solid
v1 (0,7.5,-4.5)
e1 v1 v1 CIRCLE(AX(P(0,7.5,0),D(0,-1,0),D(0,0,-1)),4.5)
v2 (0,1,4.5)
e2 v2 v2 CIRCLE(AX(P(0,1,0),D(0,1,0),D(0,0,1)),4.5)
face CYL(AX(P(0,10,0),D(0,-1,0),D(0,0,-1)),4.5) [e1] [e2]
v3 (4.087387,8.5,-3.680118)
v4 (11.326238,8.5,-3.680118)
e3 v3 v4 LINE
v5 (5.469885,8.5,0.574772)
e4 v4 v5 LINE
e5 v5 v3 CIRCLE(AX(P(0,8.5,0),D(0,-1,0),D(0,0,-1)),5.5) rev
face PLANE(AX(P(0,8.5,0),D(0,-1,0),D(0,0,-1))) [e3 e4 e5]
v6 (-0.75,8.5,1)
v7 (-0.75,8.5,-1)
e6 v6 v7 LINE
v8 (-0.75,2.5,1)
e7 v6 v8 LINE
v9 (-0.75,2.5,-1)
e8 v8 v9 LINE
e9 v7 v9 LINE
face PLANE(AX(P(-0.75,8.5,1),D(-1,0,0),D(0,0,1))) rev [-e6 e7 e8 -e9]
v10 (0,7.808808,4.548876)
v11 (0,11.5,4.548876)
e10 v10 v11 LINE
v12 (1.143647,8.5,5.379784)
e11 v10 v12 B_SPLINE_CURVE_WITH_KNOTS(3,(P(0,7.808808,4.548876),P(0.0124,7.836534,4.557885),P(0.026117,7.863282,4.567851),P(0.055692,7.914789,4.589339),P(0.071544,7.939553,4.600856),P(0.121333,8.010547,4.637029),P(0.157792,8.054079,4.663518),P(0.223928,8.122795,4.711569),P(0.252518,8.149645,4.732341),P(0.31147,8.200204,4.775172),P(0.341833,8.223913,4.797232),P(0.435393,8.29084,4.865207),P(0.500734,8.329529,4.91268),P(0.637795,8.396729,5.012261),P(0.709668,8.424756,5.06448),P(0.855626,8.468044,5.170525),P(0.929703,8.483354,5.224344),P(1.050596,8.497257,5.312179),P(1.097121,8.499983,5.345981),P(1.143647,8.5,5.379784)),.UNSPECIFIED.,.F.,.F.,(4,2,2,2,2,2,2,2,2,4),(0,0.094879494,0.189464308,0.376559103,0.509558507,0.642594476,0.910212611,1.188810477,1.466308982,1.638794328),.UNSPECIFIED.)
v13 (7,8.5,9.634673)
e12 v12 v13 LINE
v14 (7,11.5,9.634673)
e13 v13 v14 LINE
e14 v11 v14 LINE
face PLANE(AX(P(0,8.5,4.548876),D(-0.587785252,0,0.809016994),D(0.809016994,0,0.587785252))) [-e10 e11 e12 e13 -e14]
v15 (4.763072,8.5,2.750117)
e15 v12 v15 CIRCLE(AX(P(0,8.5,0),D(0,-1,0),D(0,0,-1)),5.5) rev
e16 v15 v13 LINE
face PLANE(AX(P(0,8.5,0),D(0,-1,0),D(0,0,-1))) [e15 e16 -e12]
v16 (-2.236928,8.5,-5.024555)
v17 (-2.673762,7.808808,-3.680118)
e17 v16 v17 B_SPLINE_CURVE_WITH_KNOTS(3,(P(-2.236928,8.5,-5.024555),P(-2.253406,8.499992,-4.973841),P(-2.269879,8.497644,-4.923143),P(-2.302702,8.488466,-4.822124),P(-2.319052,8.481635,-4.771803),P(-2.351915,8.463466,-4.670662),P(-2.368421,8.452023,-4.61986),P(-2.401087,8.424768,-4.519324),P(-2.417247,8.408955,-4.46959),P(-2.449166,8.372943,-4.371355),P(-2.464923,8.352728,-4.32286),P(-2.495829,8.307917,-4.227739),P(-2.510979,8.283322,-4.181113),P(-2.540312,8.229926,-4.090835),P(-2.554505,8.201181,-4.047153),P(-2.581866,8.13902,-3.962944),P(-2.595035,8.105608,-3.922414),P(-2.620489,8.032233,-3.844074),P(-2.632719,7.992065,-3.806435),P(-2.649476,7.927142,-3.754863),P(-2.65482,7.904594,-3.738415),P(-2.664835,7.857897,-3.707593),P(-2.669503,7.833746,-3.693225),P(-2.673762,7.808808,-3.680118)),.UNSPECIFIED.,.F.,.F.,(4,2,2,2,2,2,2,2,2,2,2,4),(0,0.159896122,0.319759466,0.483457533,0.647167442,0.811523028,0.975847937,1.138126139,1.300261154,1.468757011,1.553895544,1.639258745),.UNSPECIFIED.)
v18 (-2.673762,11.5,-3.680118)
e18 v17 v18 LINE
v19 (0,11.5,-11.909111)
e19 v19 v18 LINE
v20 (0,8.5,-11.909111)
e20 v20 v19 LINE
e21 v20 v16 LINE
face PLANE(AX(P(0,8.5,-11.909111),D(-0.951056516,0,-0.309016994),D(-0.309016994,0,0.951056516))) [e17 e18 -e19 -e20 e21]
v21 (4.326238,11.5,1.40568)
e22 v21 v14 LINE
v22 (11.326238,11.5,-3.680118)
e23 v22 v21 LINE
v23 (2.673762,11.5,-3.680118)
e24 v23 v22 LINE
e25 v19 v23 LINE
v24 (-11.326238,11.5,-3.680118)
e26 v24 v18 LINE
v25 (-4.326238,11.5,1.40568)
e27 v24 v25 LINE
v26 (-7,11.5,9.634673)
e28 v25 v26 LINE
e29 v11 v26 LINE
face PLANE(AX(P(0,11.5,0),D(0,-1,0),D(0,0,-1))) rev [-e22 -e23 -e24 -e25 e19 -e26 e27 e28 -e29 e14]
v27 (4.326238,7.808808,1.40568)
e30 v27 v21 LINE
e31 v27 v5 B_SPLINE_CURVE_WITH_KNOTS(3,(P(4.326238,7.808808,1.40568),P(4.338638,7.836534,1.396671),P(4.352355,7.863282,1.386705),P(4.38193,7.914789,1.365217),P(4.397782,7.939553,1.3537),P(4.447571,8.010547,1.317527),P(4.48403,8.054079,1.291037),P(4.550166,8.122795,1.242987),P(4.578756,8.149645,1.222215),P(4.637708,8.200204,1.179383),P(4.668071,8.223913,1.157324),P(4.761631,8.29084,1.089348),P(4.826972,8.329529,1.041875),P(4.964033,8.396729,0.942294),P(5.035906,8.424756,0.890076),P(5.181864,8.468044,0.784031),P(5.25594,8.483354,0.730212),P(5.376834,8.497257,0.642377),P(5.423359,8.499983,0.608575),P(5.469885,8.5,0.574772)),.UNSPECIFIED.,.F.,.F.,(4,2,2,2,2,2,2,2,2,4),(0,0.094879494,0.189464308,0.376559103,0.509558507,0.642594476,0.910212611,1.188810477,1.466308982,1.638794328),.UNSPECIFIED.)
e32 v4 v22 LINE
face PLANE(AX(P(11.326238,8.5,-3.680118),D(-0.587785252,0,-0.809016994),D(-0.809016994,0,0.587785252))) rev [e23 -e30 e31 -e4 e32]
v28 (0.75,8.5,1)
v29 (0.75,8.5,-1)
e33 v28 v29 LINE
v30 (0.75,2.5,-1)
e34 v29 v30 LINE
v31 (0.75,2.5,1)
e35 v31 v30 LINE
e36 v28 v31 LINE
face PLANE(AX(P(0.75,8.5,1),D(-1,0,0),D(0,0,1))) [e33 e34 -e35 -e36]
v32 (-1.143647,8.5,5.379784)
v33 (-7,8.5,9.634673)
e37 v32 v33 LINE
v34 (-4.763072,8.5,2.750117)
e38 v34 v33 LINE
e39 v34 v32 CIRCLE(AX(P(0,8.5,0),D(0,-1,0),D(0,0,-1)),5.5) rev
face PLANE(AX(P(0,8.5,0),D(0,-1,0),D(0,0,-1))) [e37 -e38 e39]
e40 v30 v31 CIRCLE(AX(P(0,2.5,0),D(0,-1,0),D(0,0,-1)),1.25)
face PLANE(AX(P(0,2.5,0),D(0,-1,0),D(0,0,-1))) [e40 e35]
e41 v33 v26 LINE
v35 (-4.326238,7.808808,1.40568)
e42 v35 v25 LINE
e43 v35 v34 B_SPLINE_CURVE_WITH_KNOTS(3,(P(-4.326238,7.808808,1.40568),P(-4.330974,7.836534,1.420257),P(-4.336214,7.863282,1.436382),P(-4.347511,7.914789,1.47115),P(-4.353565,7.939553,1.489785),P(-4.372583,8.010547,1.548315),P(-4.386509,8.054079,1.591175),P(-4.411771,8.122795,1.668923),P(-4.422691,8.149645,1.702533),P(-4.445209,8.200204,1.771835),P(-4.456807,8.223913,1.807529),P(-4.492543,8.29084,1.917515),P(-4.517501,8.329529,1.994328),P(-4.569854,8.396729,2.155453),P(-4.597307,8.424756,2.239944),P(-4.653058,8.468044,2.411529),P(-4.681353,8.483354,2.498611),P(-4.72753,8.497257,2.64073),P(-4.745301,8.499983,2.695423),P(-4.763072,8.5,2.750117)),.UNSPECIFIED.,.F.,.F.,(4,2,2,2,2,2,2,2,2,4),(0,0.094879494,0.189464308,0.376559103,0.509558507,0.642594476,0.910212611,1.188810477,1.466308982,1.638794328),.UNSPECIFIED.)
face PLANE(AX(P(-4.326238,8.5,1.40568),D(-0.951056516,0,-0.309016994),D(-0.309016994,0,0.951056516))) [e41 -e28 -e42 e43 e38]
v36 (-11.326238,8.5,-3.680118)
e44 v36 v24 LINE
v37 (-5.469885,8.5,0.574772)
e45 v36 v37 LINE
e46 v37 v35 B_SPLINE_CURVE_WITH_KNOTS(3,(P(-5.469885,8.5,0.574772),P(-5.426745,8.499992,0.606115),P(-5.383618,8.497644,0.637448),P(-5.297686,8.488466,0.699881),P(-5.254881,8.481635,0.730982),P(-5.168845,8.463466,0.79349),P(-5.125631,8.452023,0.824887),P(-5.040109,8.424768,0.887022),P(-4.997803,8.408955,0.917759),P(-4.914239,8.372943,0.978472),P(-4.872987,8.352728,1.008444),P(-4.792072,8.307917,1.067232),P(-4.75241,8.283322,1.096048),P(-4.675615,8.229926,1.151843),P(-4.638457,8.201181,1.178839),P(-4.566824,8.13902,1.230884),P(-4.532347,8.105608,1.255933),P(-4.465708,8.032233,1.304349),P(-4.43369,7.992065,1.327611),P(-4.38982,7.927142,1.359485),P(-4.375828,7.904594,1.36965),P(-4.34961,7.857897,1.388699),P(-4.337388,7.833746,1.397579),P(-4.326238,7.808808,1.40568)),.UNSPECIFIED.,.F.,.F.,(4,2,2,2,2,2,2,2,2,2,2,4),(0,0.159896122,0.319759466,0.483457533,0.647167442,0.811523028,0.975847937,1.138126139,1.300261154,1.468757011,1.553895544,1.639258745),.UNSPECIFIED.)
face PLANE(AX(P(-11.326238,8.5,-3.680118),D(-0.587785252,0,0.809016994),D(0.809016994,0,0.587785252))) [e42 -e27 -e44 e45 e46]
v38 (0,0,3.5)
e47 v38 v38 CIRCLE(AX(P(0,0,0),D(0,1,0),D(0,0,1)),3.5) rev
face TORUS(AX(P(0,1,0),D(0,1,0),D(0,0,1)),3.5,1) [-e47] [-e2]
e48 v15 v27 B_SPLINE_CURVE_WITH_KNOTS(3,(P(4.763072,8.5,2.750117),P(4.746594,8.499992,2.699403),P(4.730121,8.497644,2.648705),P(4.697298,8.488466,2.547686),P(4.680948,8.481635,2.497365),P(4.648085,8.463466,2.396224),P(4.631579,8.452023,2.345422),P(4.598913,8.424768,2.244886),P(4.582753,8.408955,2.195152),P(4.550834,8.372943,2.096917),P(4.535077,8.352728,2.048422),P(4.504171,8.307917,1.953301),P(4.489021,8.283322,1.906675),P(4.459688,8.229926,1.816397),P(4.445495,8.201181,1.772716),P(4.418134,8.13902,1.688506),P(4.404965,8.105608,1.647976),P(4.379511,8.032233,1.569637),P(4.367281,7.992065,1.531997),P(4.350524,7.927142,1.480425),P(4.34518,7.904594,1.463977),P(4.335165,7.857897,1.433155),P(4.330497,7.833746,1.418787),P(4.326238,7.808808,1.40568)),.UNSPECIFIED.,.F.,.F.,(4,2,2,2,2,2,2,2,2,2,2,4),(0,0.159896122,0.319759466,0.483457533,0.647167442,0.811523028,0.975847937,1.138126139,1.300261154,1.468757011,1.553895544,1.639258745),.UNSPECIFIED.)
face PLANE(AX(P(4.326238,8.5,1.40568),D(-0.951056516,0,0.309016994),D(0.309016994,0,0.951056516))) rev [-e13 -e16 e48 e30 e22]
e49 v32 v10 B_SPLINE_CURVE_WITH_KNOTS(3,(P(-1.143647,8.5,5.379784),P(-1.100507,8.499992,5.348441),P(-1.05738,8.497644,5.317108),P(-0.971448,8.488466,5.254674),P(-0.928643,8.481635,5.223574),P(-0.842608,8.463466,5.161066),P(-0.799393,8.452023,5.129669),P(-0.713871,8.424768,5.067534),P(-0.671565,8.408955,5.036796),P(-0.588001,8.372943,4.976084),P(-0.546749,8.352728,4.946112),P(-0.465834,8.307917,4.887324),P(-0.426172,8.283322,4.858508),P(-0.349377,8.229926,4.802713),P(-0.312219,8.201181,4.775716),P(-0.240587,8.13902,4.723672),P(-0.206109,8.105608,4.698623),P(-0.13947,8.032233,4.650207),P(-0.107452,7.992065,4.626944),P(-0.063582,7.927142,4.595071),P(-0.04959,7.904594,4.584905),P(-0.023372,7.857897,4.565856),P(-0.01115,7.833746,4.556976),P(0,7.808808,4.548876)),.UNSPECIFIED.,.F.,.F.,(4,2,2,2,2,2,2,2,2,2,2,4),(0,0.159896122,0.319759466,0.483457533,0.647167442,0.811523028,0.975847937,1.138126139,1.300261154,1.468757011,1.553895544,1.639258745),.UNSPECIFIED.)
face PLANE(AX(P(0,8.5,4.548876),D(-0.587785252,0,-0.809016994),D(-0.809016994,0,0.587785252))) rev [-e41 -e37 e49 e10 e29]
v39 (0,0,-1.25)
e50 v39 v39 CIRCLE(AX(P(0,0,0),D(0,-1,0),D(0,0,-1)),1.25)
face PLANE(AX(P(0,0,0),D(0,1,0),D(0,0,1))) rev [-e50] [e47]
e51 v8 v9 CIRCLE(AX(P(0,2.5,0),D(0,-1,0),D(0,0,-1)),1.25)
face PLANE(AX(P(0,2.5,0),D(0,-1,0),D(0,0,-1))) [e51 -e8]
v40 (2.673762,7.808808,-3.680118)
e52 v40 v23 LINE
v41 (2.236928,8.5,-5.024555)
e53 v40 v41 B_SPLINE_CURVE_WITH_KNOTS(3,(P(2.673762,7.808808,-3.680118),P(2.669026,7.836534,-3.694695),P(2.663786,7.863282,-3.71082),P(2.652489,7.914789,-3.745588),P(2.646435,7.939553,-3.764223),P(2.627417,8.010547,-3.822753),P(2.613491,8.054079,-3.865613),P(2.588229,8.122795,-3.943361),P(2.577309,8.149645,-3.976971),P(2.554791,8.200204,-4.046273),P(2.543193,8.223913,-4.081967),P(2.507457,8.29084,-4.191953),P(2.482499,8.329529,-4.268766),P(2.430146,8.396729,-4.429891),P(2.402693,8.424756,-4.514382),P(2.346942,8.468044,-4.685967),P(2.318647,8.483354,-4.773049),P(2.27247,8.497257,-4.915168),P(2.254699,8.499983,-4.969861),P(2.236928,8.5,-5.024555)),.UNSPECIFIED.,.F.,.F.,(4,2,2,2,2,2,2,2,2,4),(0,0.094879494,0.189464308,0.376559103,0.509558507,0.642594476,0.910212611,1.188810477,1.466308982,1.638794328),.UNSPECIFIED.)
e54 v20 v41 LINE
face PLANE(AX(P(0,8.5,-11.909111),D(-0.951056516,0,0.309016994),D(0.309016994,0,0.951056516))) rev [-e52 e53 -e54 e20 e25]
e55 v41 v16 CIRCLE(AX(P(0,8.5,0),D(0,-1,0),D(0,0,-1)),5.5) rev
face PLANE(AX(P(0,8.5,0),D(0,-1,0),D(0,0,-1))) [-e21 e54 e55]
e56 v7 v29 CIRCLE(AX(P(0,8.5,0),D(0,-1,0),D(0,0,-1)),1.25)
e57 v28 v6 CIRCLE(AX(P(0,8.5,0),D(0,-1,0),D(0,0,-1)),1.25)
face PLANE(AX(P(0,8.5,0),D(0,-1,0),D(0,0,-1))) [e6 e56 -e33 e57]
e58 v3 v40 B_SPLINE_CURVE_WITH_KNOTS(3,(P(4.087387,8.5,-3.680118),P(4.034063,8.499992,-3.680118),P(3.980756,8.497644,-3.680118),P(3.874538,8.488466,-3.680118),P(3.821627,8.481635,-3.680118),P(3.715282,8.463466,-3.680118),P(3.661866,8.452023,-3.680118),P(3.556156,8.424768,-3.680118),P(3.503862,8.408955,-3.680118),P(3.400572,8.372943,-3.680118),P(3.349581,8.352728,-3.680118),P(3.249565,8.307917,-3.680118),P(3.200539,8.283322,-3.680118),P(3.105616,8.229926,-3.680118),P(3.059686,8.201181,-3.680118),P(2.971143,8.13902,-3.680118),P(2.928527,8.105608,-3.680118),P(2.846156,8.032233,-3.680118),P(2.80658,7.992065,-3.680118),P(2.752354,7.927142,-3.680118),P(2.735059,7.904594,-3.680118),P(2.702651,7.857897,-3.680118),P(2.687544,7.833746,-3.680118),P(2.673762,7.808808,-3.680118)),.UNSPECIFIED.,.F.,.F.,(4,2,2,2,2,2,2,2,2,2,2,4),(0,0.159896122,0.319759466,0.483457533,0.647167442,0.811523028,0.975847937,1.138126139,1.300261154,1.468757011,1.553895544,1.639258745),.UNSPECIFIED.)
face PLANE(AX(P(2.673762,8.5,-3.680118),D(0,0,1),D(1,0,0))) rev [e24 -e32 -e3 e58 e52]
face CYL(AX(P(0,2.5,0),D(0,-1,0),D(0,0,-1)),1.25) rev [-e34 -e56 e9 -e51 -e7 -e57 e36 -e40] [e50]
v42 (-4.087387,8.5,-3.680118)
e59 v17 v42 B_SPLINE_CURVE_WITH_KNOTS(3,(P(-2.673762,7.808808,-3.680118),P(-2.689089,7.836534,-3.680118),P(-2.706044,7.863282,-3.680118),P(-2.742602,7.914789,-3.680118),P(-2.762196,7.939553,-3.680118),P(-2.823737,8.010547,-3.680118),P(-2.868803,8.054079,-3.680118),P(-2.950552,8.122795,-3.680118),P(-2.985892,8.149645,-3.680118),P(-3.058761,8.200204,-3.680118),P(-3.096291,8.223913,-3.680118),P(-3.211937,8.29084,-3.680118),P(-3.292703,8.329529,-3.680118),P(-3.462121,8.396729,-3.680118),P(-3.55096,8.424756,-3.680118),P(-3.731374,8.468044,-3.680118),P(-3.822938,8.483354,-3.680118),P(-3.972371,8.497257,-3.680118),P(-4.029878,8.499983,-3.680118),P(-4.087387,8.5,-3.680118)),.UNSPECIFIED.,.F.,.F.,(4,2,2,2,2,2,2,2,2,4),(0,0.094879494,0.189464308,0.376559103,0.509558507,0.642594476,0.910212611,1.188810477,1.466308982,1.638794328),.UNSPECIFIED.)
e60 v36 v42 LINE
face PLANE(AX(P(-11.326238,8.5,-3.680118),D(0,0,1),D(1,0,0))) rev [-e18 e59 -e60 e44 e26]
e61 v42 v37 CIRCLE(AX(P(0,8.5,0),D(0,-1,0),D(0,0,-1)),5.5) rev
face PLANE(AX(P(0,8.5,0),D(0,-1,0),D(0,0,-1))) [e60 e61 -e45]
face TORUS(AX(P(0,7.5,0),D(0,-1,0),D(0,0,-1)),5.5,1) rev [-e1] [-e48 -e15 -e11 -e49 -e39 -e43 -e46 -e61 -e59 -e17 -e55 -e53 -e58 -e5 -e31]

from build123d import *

# Parameters (mm, degrees)
SKETCH2_R                = 4.5
BOSS_EXTRUDE1_DEPTH      = 10
SKETCH4_R                = 1.25
CUT_EXTRUDE1_DEPTH       = 2.5
CUT_EXTRUDE4_DEPTH       = 6
BOSS_EXTRUDE7_DEPTH      = 1.5
BOSS_EXTRUDE7_DEPTH_BACK = 1.5
FILLET2_R                = 1


with BuildPart() as part:
    # Sketch2 → Boss-Extrude1 (new body)
    with BuildSketch(Plane(origin=(0, 0, 0), x_dir=(1, 0, 0), z_dir=(0, 1, 0))):
        with Locations(Location((0, 0, 0), (0, 0, 270))):
            Circle(SKETCH2_R)
    extrude(amount=BOSS_EXTRUDE1_DEPTH)

    # Sketch4 → Cut-Extrude1 (cut)
    with BuildSketch(Plane.XZ):
        with Locations(Location((0, 0, 0), (0, 0, 270))):
            Circle(SKETCH4_R)
    extrude(amount=-CUT_EXTRUDE1_DEPTH, mode=Mode.SUBTRACT)

    # Sketch5 → Cut-Extrude4 (cut)
    with BuildSketch(Plane.XZ.offset(-2.5)):
        with BuildLine():
            Line((-0.75, 1), (-0.75, -1))
            ThreePointArc((-0.75, -1), (0, -1.25), (0.75, -1))
            Line((0.75, -1), (0.75, 1))
            ThreePointArc((0.75, 1), (0, 1.25), (-0.75, 1))
        make_face()
    extrude(amount=-CUT_EXTRUDE4_DEPTH, mode=Mode.SUBTRACT)

    # Sketch3 → Boss-Extrude7 (add, two sides: drawn at the far end of the back side and taken through both)
    with BuildSketch(Plane(origin=(0, 10, 0), x_dir=(1, 0, 0), z_dir=(0, 1, 0)).offset(-BOSS_EXTRUDE7_DEPTH_BACK)):
        Polygon((0, 11.909111317), (-2.673762079, 3.680117785), (-11.326237921, 3.680117785), (-4.326237921, -1.405679911), (-7, -9.634673443), (0, -4.548875747), (7, -9.634673443), (4.326237921, -1.405679911), (11.326237921, 3.680117785), (2.673762079, 3.680117785), align=None)
    extrude(amount=BOSS_EXTRUDE7_DEPTH + BOSS_EXTRUDE7_DEPTH_BACK)

    # Fillet2
    # the kernel refuses this fillet: 1 mm, written as the material it adds along each edge
    with BuildSketch(Plane(origin=(0, 8.5, 0), x_dir=(0, 0, 1), z_dir=(1, 0, 0))) as fillet2_piece_1_section:
        with BuildLine():
            CenterArc((4.5 + FILLET2_R, FILLET2_R), FILLET2_R, 180, 90)
            Line((4.5 + FILLET2_R, 0), (4.5, 0))
            Line((4.5, 0), (4.5, FILLET2_R))
        make_face()
    fillet2_piece_1 = revolve(axis=Axis((0, 8.5, 0), (0, -1, 0)), mode=Mode.PRIVATE)
    fillet2_piece_1 = split(fillet2_piece_1, bisect_by=Plane(origin=(3e-09, 8.080053503, -3.680117785), z_dir=(0, 0, 1)), keep=Keep.TOP, mode=Mode.PRIVATE)
    fillet2_piece_1 = split(fillet2_piece_1, bisect_by=Plane(origin=(-0.015987158, 8.080053503, 4.537260397), z_dir=(0.587785252292471, 0, -0.8090169943749492)), keep=Keep.TOP, mode=Mode.PRIVATE)
    fillet2_piece_1 = split(fillet2_piece_1, bisect_by=Plane(origin=(0.015987161, 8.080053503, 4.537260395), z_dir=(-0.5877852522924681, 0, -0.8090169943749511)), keep=Keep.TOP, mode=Mode.PRIVATE)
    add(fillet2_piece_1)
    with BuildSketch(Plane(origin=(0, 8.5, 0), x_dir=(0, 0, 1), z_dir=(1, 0, 0))) as fillet2_piece_2_section:
        with BuildLine():
            CenterArc((4.5 + FILLET2_R, FILLET2_R), FILLET2_R, 180, 90)
            Line((4.5 + FILLET2_R, 0), (4.5, 0))
            Line((4.5, 0), (4.5, FILLET2_R))
        make_face()
    fillet2_piece_2 = revolve(axis=Axis((0, 8.5, 0), (0, -1, 0)), mode=Mode.PRIVATE)
    fillet2_piece_2 = split(fillet2_piece_2, bisect_by=Plane(origin=(-4.906405348, 8.214560611, 3.191251651), z_dir=(0.9510565162951518, 0, 0.30901699437495306)), keep=Keep.TOP, mode=Mode.PRIVATE)
    fillet2_piece_2 = split(fillet2_piece_2, bisect_by=Plane(origin=(4.369206305, 8.214560611, 1.537922999), z_dir=(-0.9510565162951523, 0, 0.30901699437495134)), keep=Keep.TOP, mode=Mode.PRIVATE)
    fillet2_piece_2 = split(fillet2_piece_2, bisect_by=Plane(origin=(-1.518898049, 8.214560611, 5.652419775), z_dir=(-0.5877852522924681, 0, -0.8090169943749511)), keep=Keep.TOP, mode=Mode.PRIVATE)
    add(fillet2_piece_2)
    with BuildSketch(Plane(origin=(0, 8.5, 0), x_dir=(0, 0, 1), z_dir=(1, 0, 0))) as fillet2_piece_3_section:
        with BuildLine():
            CenterArc((4.5 + FILLET2_R, FILLET2_R), FILLET2_R, 180, 90)
            Line((4.5 + FILLET2_R, 0), (4.5, 0))
            Line((4.5, 0), (4.5, FILLET2_R))
        make_face()
    fillet2_piece_3 = revolve(axis=Axis((0, 8.5, 0), (0, -1, 0)), mode=Mode.PRIVATE)
    fillet2_piece_3 = split(fillet2_piece_3, bisect_by=Plane(origin=(4.906405349, 8.214560608, 3.191251652), z_dir=(-0.9510565162951523, 0, 0.30901699437495134)), keep=Keep.TOP, mode=Mode.PRIVATE)
    fillet2_piece_3 = split(fillet2_piece_3, bisect_by=Plane(origin=(1.51889805, 8.214560608, 5.652419777), z_dir=(0.587785252292471, 0, -0.8090169943749492)), keep=Keep.TOP, mode=Mode.PRIVATE)
    fillet2_piece_3 = split(fillet2_piece_3, bisect_by=Plane(origin=(2.163118969, 8.214560608, 2.977277823), z_dir=(0.5877852522924681, 0, 0.8090169943749511)), keep=Keep.TOP, mode=Mode.PRIVATE)
    add(fillet2_piece_3)
    # the kernel refuses this fillet: 1 mm, written as the material it takes off along each edge
    with BuildSketch(Plane(origin=(0, 0, 0), x_dir=(0, 0, 1), z_dir=(-1, 0, 0))) as fillet2_2_piece_1:
        with BuildLine():
            CenterArc((4.5 - FILLET2_R, FILLET2_R), FILLET2_R, 270, 90)
            Line((4.5 - FILLET2_R, 0), (4.5, 0))
            Line((4.5, 0), (4.5, FILLET2_R))
        make_face()
    revolve(axis=Axis((0, 0, 0), (0, 1, 0)), mode=Mode.SUBTRACT)


solid = part.part
